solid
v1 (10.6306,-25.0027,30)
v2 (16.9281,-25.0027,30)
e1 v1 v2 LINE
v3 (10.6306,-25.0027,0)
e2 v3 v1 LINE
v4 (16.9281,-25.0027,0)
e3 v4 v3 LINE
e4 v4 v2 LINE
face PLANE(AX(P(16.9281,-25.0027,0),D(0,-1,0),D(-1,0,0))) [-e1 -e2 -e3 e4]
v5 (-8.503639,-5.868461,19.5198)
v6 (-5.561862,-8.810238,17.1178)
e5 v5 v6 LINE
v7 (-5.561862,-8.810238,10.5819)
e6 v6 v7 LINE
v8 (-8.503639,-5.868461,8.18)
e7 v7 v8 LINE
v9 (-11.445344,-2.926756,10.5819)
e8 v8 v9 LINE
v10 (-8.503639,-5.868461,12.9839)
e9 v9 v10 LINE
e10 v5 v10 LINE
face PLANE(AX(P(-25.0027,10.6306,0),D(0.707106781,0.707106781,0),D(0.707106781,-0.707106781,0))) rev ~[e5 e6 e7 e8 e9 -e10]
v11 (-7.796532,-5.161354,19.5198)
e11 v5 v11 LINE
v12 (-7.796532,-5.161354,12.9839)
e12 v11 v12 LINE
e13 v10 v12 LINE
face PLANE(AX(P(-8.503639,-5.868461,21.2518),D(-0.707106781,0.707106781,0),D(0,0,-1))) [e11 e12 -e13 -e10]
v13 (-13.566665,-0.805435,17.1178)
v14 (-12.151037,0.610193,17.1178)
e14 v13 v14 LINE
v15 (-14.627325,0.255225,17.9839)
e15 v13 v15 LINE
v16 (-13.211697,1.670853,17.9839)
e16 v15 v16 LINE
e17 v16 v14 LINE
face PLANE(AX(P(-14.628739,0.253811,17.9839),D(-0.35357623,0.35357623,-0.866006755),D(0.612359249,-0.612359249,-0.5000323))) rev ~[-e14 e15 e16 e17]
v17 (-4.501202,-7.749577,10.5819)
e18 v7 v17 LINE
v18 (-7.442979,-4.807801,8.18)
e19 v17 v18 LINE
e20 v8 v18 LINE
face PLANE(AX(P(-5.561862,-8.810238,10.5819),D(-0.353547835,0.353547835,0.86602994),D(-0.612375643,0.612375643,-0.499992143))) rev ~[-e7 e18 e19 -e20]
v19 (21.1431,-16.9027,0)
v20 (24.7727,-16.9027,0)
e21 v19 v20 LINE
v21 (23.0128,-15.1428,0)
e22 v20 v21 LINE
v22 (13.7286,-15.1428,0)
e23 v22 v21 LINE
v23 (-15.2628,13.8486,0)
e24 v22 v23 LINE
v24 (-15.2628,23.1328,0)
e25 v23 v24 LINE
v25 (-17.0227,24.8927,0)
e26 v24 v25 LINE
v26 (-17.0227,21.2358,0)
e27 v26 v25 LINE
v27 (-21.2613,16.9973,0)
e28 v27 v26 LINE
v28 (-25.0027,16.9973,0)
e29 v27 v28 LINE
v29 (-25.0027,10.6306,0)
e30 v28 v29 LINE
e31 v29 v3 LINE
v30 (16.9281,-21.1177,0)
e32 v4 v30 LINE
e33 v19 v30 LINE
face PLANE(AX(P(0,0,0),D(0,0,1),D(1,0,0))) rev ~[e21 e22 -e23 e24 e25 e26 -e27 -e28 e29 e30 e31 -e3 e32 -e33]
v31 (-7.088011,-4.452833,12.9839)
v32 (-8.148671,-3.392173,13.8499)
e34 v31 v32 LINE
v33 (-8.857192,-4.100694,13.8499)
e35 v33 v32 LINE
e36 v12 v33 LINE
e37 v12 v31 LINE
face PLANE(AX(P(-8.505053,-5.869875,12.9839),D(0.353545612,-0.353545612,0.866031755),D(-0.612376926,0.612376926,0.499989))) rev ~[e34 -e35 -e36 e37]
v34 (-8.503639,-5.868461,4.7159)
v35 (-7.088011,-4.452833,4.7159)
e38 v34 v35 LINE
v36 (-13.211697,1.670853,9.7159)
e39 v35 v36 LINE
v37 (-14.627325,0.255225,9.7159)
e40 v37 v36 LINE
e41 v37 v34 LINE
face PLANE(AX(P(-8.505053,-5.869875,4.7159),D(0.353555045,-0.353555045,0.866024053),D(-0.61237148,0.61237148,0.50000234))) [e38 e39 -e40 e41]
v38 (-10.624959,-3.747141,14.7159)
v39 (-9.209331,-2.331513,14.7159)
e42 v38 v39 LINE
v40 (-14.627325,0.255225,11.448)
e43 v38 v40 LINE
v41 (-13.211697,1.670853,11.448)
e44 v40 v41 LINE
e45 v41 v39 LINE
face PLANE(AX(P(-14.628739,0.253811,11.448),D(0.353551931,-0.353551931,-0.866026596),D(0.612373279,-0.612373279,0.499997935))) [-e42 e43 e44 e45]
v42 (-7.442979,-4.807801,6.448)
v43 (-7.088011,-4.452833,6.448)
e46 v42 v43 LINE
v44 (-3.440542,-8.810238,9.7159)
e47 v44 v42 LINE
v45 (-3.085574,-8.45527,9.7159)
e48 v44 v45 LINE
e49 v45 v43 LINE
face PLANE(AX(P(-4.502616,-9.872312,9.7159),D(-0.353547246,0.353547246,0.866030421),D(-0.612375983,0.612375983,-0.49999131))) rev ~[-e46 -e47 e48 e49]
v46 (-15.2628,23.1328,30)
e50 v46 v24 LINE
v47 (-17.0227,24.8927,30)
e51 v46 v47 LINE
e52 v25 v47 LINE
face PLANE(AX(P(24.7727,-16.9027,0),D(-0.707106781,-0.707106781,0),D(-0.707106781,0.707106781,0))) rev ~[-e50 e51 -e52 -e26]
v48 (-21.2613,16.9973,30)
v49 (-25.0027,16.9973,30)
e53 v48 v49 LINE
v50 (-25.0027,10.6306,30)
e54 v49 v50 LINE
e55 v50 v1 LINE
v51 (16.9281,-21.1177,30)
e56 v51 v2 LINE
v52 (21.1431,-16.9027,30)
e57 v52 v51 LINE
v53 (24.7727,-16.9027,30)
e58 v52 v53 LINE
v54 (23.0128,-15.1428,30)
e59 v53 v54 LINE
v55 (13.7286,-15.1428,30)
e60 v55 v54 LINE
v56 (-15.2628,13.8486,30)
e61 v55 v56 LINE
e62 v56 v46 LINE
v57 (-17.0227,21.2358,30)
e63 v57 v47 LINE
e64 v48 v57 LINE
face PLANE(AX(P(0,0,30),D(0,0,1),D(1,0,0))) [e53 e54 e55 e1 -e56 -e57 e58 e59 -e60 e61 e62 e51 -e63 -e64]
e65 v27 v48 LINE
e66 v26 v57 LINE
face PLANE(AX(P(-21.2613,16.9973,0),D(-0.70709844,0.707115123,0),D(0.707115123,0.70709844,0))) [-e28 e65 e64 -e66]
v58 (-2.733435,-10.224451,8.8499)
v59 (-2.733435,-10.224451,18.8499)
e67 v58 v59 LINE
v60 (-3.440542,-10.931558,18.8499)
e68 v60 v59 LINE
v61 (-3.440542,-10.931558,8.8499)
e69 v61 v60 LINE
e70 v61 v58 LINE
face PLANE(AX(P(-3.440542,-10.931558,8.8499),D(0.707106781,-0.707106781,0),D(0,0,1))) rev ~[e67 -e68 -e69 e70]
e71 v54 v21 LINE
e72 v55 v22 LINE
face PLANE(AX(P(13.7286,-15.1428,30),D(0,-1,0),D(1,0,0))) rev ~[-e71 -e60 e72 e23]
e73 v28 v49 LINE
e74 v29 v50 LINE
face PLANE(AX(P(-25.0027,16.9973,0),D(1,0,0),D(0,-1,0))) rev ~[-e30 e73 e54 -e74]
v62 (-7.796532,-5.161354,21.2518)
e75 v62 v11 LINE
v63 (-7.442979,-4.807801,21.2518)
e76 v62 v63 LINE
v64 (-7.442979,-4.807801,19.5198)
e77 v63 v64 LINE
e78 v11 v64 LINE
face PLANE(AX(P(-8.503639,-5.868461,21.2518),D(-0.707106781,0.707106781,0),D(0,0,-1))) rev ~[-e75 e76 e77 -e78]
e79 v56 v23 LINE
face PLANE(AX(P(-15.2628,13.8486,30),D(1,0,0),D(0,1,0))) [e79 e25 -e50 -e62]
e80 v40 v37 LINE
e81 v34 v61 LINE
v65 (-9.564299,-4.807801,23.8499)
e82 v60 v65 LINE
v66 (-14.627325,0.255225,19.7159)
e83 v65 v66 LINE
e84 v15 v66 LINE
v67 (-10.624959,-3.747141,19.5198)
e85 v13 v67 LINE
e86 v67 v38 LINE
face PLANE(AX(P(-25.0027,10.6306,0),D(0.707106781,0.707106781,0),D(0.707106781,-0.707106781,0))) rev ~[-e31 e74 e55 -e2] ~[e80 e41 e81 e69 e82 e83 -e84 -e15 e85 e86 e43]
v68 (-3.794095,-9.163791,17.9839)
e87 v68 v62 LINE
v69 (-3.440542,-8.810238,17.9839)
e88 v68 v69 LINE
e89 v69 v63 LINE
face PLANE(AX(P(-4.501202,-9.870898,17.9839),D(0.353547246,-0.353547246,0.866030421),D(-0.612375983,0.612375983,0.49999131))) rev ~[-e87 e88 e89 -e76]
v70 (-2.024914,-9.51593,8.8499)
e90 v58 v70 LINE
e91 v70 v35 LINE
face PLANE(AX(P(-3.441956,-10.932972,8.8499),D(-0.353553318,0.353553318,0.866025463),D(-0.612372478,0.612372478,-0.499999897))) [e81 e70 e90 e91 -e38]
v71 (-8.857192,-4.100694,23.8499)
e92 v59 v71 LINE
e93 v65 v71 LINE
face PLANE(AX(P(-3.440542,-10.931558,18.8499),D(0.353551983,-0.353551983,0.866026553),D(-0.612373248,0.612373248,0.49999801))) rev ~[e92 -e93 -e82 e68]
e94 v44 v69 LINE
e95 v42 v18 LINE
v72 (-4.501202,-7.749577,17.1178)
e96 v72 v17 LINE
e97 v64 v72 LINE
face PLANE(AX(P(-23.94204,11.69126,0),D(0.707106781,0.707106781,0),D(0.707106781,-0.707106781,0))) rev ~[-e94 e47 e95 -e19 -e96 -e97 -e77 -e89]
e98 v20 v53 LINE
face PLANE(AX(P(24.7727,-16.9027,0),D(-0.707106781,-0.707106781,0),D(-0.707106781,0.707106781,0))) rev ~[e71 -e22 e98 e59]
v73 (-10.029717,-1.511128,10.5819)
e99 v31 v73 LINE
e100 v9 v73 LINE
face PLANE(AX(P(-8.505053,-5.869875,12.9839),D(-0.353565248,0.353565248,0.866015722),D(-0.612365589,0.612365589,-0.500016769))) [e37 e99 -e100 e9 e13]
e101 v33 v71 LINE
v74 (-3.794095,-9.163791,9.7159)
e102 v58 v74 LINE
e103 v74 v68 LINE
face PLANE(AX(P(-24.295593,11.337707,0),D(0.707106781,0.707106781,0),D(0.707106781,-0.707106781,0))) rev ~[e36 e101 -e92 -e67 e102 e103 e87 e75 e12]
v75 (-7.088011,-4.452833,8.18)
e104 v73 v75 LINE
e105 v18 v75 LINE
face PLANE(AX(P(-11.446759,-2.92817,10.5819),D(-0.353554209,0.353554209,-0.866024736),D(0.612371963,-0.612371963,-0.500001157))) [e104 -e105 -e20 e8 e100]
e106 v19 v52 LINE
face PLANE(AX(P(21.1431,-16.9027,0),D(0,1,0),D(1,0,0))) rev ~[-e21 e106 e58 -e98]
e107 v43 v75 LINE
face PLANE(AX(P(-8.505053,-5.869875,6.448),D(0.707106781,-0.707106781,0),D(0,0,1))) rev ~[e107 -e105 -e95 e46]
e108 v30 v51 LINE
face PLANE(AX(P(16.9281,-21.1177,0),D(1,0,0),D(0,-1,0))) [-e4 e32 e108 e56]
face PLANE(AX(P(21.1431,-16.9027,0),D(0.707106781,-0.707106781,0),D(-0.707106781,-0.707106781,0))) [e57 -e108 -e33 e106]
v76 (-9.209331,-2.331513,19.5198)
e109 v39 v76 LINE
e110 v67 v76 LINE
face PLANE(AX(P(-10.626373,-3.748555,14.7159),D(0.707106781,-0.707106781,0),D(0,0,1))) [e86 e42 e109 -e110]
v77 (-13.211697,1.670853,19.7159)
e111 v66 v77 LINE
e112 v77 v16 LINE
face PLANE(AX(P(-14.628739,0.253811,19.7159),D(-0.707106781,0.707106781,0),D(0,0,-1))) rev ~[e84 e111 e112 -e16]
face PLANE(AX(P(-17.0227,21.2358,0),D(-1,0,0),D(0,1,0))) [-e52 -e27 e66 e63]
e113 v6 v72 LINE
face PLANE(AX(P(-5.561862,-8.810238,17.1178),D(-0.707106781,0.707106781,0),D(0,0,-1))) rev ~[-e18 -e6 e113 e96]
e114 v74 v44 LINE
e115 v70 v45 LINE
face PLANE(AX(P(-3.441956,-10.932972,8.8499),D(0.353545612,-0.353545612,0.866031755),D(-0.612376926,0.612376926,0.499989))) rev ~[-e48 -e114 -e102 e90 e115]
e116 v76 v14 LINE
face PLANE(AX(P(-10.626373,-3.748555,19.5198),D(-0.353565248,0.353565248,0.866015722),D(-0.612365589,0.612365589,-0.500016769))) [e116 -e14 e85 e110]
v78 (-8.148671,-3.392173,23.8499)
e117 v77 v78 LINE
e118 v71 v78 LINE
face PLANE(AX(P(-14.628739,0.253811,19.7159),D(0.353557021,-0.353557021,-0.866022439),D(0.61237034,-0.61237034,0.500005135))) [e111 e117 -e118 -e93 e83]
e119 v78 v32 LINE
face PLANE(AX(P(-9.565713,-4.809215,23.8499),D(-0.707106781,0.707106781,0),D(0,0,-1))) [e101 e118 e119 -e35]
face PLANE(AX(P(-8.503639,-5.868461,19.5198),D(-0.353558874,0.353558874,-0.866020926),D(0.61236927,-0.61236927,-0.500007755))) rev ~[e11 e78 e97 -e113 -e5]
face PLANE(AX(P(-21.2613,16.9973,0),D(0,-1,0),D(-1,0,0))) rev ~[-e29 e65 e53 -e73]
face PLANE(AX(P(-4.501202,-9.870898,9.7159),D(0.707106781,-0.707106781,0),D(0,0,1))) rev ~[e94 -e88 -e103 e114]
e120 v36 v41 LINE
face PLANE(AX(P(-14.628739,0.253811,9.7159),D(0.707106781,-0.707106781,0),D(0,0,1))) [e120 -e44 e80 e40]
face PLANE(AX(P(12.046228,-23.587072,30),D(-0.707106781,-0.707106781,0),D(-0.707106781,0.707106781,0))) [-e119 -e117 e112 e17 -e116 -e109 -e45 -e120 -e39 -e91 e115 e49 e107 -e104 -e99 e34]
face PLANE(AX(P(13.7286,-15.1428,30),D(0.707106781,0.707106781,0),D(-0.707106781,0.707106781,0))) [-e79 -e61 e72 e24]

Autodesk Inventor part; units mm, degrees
ref_plane "YZ Plane" through (0, 0, 0) normal (1, 0, 0) x (0, 1, 0)
ref_plane "XZ Plane" through (0, 0, 0) normal (0, 1, 0) x (-1, 0, 0)
sketch "Sketch1" plane through (0, 0, 0) normal (0, 0, 1) x (1, 0, 0)
  line L0 (21.1431, -16.9027) -> (16.9281, -21.1177)
  line L1 (-21.2613, 16.9973) -> (-17.0227, 21.2358)
  line L2 (-17.0227, 21.2358) -> (16.9281, -21.1177) construction
  line L3 (21.1431, -16.9027) -> (-21.2613, 16.9973) construction
  line L4 (-17.0227, 21.2358) -> (36.8231, 21.2358) construction
  line L5 (16.9281, -21.1177) -> (16.9281, -25.0027)
  line L6 (-17.0227, 21.2358) -> (-17.0227, 24.8927)
  line L7 (21.1431, -16.9027) -> (24.7727, -16.9027)
  line L8 (24.7727, -16.9027) -> (-17.0227, 24.8927)
  line L9 (-25.0027, 16.9973) -> (-25.0027, 10.6306)
  line L10 (16.9281, -25.0027) -> (10.6306, -25.0027)
  line L11 (-25.0027, 10.6306) -> (10.6306, -25.0027)
  line L12 (-25.0027, 16.9973) -> (-7.0741, 16.9973) construction
  line L13 (-17.1227, 21.2773) -> (-21.3027, 17.0973)
  line L14 (16.8927, -21.1827) -> (21.0727, -17.0027)
  line L15 (24.7727, -17.0027) -> (21.1414, -17.0027)
  line L16 (22.7727, -25.0027) -> (-23.0273, -25.0027)
  line L17 (16.8927, -25.0027) -> (16.8927, -21.2526)
  line L18 (-17.1227, 25.0973) -> (-17.1227, 21.3471)
  line L19 (-25.0027, 17.0973) -> (-21.3714, 17.0973)
  line L20 (-21.2613, 16.9973) -> (-25.0027, 16.9973)
  point P0 (0, 0)
  point P1 (16.8927, -21.2526)
extrude "Extrusion1" add sketch "Sketch1" along normal blind 30
ref_plane "Work Plane1" through (16.9, -16.9, -8) normal (-0.7071068, -0.7071068, 0) x (0, 0, 1)
sketch "Sketch7" plane through (0, 0, 30) normal (0, 0, 1) x (1, 0, 0)
  line L0 (21.1431, -16.9027) -> (24.7727, -16.9027) projected
  line L1 (24.7727, -16.9027) -> (-17.0227, 24.8927) projected
  line L2 (-17.0227, 24.8927) -> (-17.0227, 21.2358) projected
  line L3 (-17.0227, 21.2358) -> (-21.2613, 16.9973) projected
  line L4 (-21.2613, 16.9973) -> (-25.0027, 16.9973) projected
  line L5 (-25.0027, 16.9973) -> (-25.0027, 10.6306) projected
  line L6 (-25.0027, 10.6306) -> (10.6306, -25.0027) projected
  line L7 (10.6306, -25.0027) -> (16.9281, -25.0027) projected
  line L8 (16.9281, -25.0027) -> (16.9281, -21.1177) projected
  line L9 (16.9281, -21.1177) -> (21.1431, -16.9027) projected
  line L10 (3.875, 3.995) -> (-7.1861, -7.1861)
  line L11 (-25.0027, 10.6306) -> (10.6306, -25.0027) projected
  line L12 (23.0128, -5.8586) -> (13.7286, -15.1428)
  line L13 (13.7286, -15.1428) -> (-15.2628, 13.8486)
  line L14 (-15.2628, 13.8486) -> (-5.9786, 23.1328)
  line L15 (-5.9786, 23.1328) -> (23.0128, -5.8586)
  line L16 (23.0128, -5.8586) -> (-15.2628, 13.8486) construction
  line L17 (13.7286, -15.1428) -> (-5.9786, 23.1328) construction
  line L18 (-15.2628, 13.8486) -> (-15.2628, 23.1328)
  line L19 (24.7727, -16.9027) -> (-17.0227, 24.8927) projected
  line L20 (13.7286, -15.1428) -> (23.0128, -15.1428)
  point P0 (0, 0)
  dimension "d28" = 41
  dimension "d29" = 1
  dimension "d74" = 0
extrude "Extrusion7" cut sketch "Sketch7" against normal through all contours L20 L12 L1 | L12 L13 L10 L1 | L1 L14 L15 L12 | L10 L13 L14 L1 | L14 L18 L1
sketch "Sketch10" plane through (10.6306, -25.0027, 30) normal (-0.7071068, -0.7071068, 0) x (-0.7071068, 0.7071068, 0)
  line L0 (1.6838, 16.5215) -> (7.0744, 19.4702) construction
  line L1 (7.0744, 19.4702) -> (7.0744, 10.5304) construction
  line L2 (7.0744, 10.5304) -> (1.6838, 10.5304) construction
  line L3 (1.6838, 10.5304) -> (1.6838, 6.839) construction
  line L4 (1.6838, 6.839) -> (6.7206, 6.839) construction
  line L5 (6.7206, 6.839) -> (6.7206, 1.2092) construction
  line L6 (6.7206, 1.2092) -> (1.6838, 1.2092) construction
  line L7 (1.6838, 1.2092) -> (1.6838, -3.423) construction
  line L8 (1.6838, -3.423) -> (55.1934, -3.423) construction
  line L9 (1.6838, 30.377) -> (1.6838, 26.2152) construction
  line L10 (1.6838, 26.2152) -> (7.1181, 26.2152) construction
  line L11 (7.1181, 26.2152) -> (7.1181, 20.0634) construction
  line L12 (7.1181, 20.0634) -> (1.6838, 20.0634) construction
  line L13 (1.6838, 20.0634) -> (1.6838, 16.5215) construction
  line L14 (7.0744, 15.0003) -> (55.1934, 14.9149) construction
  line L15 (1.6838, 30.377) -> (36.6838, 30.377) construction
  line L16 (36.6838, -3.423) -> (1.6838, -3.423) construction
  line L17 (19.8996, 21.1501) -> (19.8996, 11.1501)
  line L18 (19.8996, 11.1501) -> (28.5599, 6.1501)
  line L19 (19.8996, 21.1501) -> (21.3996, 20.2841)
  line L20 (21.3996, 20.2841) -> (21.3996, 12.0161)
  line L21 (21.3996, 12.0161) -> (27.0599, 8.7482)
  line L22 (27.0599, 8.7482) -> (27.0599, 17.0161)
  line L23 (27.0599, 17.0161) -> (28.5599, 16.1501)
  line L24 (28.5599, 16.1501) -> (28.5599, 6.1501)
  line L25 (50.3931, 0) -> (0, 0) construction
  line L26 (50.3931, 30) -> (50.3931, 0) construction
  line L27 (50.3931, 15) -> (0, 15) construction
  line L28 (0, 30) -> (0, 0) construction
  point P0 (25.1966, 30)
  point P1 (25.1966, 15)
  dimension "d40" = 1.5
  dimension "d41" = 1.5
  dimension "d42" = 1.5
  dimension "d43" = 10
  dimension "d44" = 10
  dimension "d75" = 8.268
  dimension "d76" = 120
emboss "Emboss1" sketch "Sketch10" operation cut depth 1 direction (0.7071068, 0.7071068, 0)
sketch "Sketch11" plane through (10.6306, -25.0027, 30) normal (-0.7071068, -0.7071068, 0) x (-0.7071068, 0.7071068, 0)
  line L0 (21.3996, 12.0161) -> (27.0599, 8.7482) construction
  line L1 (27.0599, 8.7482) -> (27.0599, 17.0161) construction
  line L2 (27.0599, 17.0161) -> (28.5599, 16.1501) construction
  line L3 (28.5599, 16.1501) -> (28.5599, 6.1501) construction
  line L4 (28.5599, 6.1501) -> (19.8996, 11.1501) construction
  line L5 (19.8996, 11.1501) -> (19.8996, 21.1501) construction
  line L6 (19.8996, 21.1501) -> (21.3996, 20.2841) construction
  line L7 (21.3996, 20.2841) -> (21.3996, 12.0161) construction
  line L8 (50.3931, 30) -> (0, 30) construction
  line L9 (0, 30) -> (0, 0) construction
  line L10 (50.3931, 0) -> (0, 0) construction
  line L11 (50.3931, 30) -> (50.3931, 0) construction
  line L12 (9.2379, 27.3057) -> (21.3996, 20.2841) construction
  line L13 (21.3996, 20.2841) -> (21.3996, 12.0161) construction
  line L14 (21.3996, 12.0161) -> (27.0599, 8.7482) construction
  line L15 (27.0599, 8.7482) -> (27.0599, 7.4216) construction
  line L16 (27.0599, 7.4216) -> (17.8982, 13.0177) construction
  line L17 (17.8982, 13.0177) -> (17.8982, 3.0177) construction
  line L18 (17.8982, 3.0177) -> (9.2379, 8.0177) construction
  line L19 (9.2379, 8.0177) -> (9.2379, 27.3057) construction
  line L20 (15.5651, 18.4016) -> (15.5, -16.9) construction
  line L21 (15.5651, 18.4016) -> (-17.5, 16.9) construction
  line L22 (-17.5, 16.9) -> (-17.5, 12.7382) construction
  line L23 (-17.5, 12.7382) -> (-12.0658, 12.7382) construction
  line L24 (-12.0658, 12.7382) -> (-12.0658, 6.5864) construction
  line L25 (-12.0658, 6.5864) -> (-17.5, 6.5864) construction
  line L26 (-17.5, 6.5864) -> (-17.5, 3.0446) construction
  line L27 (-17.5, 3.0446) -> (-12.1095, 3.0446) construction
  line L28 (-12.1095, 3.0446) -> (-12.1095, -2.9465) construction
  line L29 (-12.1095, -2.9465) -> (-17.5, -2.9465) construction
  line L30 (-17.5, -2.9465) -> (-17.5, -6.638) construction
  line L31 (-17.5, -6.638) -> (-12.4632, -6.638) construction
  line L32 (-12.4632, -6.638) -> (-12.4632, -12.2678) construction
  line L33 (-12.4632, -12.2678) -> (-17.5, -12.2678) construction
  line L34 (-17.5, -12.2678) -> (-17.5, -16.9) construction
  line L35 (-17.5, -16.9) -> (15.5, -16.9) construction
  line L36 (-12.1095, 0.049) -> (15.5326, 0.7508) construction
  line L37 (15.5, -16.9) -> (15.5651, 18.4016) construction
  line L38 (1.91, 17.7815) -> (1.91, -16.9) construction
  line L39 (15.5, -16.9) -> (-17.5, -16.9) construction
  line L40 (27.0599, 8.7482) -> (27.0599, 7.4216) construction
  line L41 (21.3996, 20.2841) -> (21.3996, 12.0161)
  line L42 (21.3996, 12.0161) -> (27.0599, 8.7482)
  line L43 (21.3996, 20.2841) -> (21.3996, 12.0161)
  line L44 (21.3996, 12.0161) -> (27.0599, 8.7482)
  line L45 (27.0599, 8.7482) -> (27.0599, 10.4802)
  line L46 (27.0599, 8.7482) -> (27.0599, 7.4216)
  line L47 (27.0599, 10.4802) -> (22.8996, 12.8822)
  line L48 (22.8996, 12.8822) -> (22.8996, 19.4181)
  line L49 (22.8996, 19.4181) -> (27.0599, 21.82)
  line L50 (21.3996, 20.2841) -> (27.0599, 23.552)
  line L51 (27.0599, 23.552) -> (27.0599, 21.82)
  point P0 (25.1966, 30)
  point P1 (20.9754, 14.9785)
  dimension "d47" = 120
  dimension "d48" = 1.5
  dimension "d49" = 1.5
  dimension "d50" = 1.5
  dimension "d77" = 8.268
  dimension "d78" = 4.1602
  dimension "d79" = 5.6602
  dimension "d80" = 120
  dimension "d81" = 120
emboss "Emboss2" sketch "Sketch11" operation cut depth 1.5 direction (0.7071068, 0.7071068, 0)
sketch "Sketch12" plane through (10.6306, -25.0027, 30) normal (-0.7071068, -0.7071068, 0) x (-0.7071068, 0.7071068, 0)
  line L0 (22.8996, 12.8822) -> (27.0599, 10.4802) construction
  line L1 (27.0599, 10.4802) -> (27.0599, 17.0161) construction
  line L2 (27.0599, 17.0161) -> (28.5599, 16.1501) construction
  line L3 (28.5599, 16.1501) -> (28.5599, 6.1501) construction
  line L4 (28.5599, 6.1501) -> (19.8996, 11.1501) construction
  line L5 (19.8996, 11.1501) -> (19.8996, 21.1501) construction
  line L6 (19.8996, 21.1501) -> (21.3996, 20.2841) construction
  line L7 (21.3996, 20.2841) -> (27.0599, 23.552) construction
  line L8 (27.0599, 23.552) -> (27.0599, 21.82) construction
  line L9 (27.0599, 21.82) -> (22.8996, 19.4181) construction
  line L10 (22.8996, 19.4181) -> (22.8996, 12.8822) construction
  line L11 (50.3931, 30) -> (0, 30) construction
  line L12 (0, 30) -> (0, 0) construction
  line L13 (50.3931, 0) -> (0, 0) construction
  line L14 (50.3931, 30) -> (50.3931, 0) construction
  line L15 (12.7689, 9.4432) -> (16.9291, 7.0413) construction
  line L16 (16.9291, 7.0413) -> (27.0599, 17.0161) construction
  line L17 (27.0599, 17.0161) -> (28.5599, 16.1501) construction
  line L18 (28.5599, 16.1501) -> (28.5599, 6.1501) construction
  line L19 (28.5599, 6.1501) -> (13.0911, 5.9826) construction
  line L20 (13.0911, 5.9826) -> (19.8996, 21.1501) construction
  line L21 (19.8996, 21.1501) -> (21.3996, 20.2841) construction
  line L22 (21.3996, 20.2841) -> (27.0599, 23.552) construction
  line L23 (27.0599, 23.552) -> (27.0599, 21.82) construction
  line L24 (27.0599, 21.82) -> (12.7689, 15.9791) construction
  line L25 (12.7689, 15.9791) -> (12.7689, 9.4432) construction
  line L26 (-17.5, 16.9) -> (-17.5, 12.7382) construction
  line L27 (-17.5, 12.7382) -> (-12.0658, 12.7382) construction
  line L28 (-12.0658, 12.7382) -> (-12.0658, 6.5864) construction
  line L29 (-12.0658, 6.5864) -> (-17.5, 6.5864) construction
  line L30 (-17.5, 6.5864) -> (-17.5, 3.0446) construction
  line L31 (-17.5, 3.0446) -> (-12.1095, 3.0446) construction
  line L32 (-12.1095, 3.0446) -> (-12.1095, -2.9465) construction
  line L33 (-12.1095, -2.9465) -> (-17.5, -2.9465) construction
  line L34 (-17.5, -2.9465) -> (-17.5, -6.638) construction
  line L35 (-17.5, -6.638) -> (-12.4632, -6.638) construction
  line L36 (-12.4632, -6.638) -> (-12.4632, -12.2678) construction
  line L37 (-12.4632, -12.2678) -> (-17.5, -12.2678) construction
  line L38 (-17.5, -12.2678) -> (-17.5, -16.9) construction
  line L39 (-17.5, -16.9) -> (15.5, -16.9) construction
  line L40 (21.3996, 20.2841) -> (27.0599, 23.552)
  line L41 (19.8996, 21.1501) -> (21.3996, 20.2841)
  line L42 (21.3996, 20.2841) -> (27.0599, 23.552)
  line L43 (27.0599, 23.552) -> (27.0599, 21.82)
  line L44 (27.0599, 23.552) -> (27.0599, 21.82)
  line L45 (16.9291, 7.0413) -> (27.0599, 17.0161) construction
  line L46 (19.8996, 21.1501) -> (27.0599, 25.2841)
  line L47 (27.0599, 25.2841) -> (35.7201, 20.2841)
  line L48 (35.7201, 20.2841) -> (35.7201, 18.552)
  line L49 (35.7201, 18.552) -> (30.0599, 15.2841)
  line L50 (30.0599, 15.2841) -> (30.0599, 10.4802)
  line L51 (30.0599, 10.4802) -> (34.2201, 12.8822)
  line L52 (35.7201, 10.2841) -> (35.7201, 10.2841)
  line L53 (35.7201, 10.2841) -> (28.5599, 6.1501)
  line L54 (27.0599, 17.0161) -> (28.5599, 16.1501)
  line L55 (28.5599, 6.1501) -> (28.5599, 16.1501)
  line L56 (28.5599, 16.1501) -> (27.0599, 17.0161)
  line L57 (27.0599, 21.82) -> (27.0599, 23.552)
  line L58 (28.5599, 16.1501) -> (28.5599, 6.1501)
  line L59 (27.0599, 17.0161) -> (31.2201, 19.4181)
  line L60 (31.2201, 19.4181) -> (27.0599, 21.82)
  line L61 (13.0911, 5.9826) -> (28.5599, 6.1501) construction
  line L62 (12.7689, 9.4432) -> (16.9291, 7.0413) construction
  line L63 (12.7689, 9.4432) -> (28.5599, 9.6142) construction
  line L64 (28.5599, 9.6142) -> (29.486, 10.1489) construction
  line L65 (28.5599, 16.1501) -> (35.7201, 20.2841) construction
  line L66 (28.5599, 6.1501) -> (34.2971, 9.4625) construction
  line L67 (31.2201, 19.4181) -> (35.3769, 18.7502) construction
  line L68 (27.0599, 23.552) -> (27.0599, 21.82) construction
  line L69 (35.3769, 18.7502) -> (27.0599, 23.552) construction
  line L70 (35.7201, 10.2841) -> (35.7201, 12.0161)
  line L71 (35.7201, 12.0161) -> (34.2201, 12.8822)
  line L72 (16.3223, 7.4494) -> (20.4826, 5.0475) construction
  line L73 (16.3223, 13.9853) -> (16.3223, 7.4494) construction
  line L74 (20.4826, 16.3872) -> (16.3223, 13.9853) construction
  line L75 (20.4826, 18.1193) -> (20.4826, 16.3872) construction
  line L76 (14.8223, 14.8513) -> (20.4826, 18.1193) construction
  line L77 (14.8223, 15.7065) -> (14.8223, 14.8513) construction
  line L78 (20.4826, 12.5307) -> (14.8223, 15.7065) construction
  line L79 (20.4826, 5.0475) -> (20.4826, 12.5307) construction
  line L80 (20.4826, 12.5307) -> (28.5599, 7.9987) construction
  line L81 (28.5599, 7.9987) -> (33.93, 11.0117) construction
  point P0 (25.1966, 30)
  point P1 (20.9754, 14.9785)
  dimension "d54" = 60
  dimension "d55" = 1.5
  dimension "d57" = 120
  dimension "d58" = 1.5
  dimension "d59" = 120
  dimension "d82" = 3
  dimension "d83" = 3
  dimension "d84" = 3
  dimension "d85" = 1.5
  dimension "d86" = 7.1602
  dimension "d87" = 7.1602
  dimension "d88" = 4.1602
  dimension "d89" = 1.7321
  dimension "d90" = 5.6602
  dimension "d91" = 1.7321
  dimension "d92" = 4.1602
extrude "Extrusion9" cut sketch "Sketch12" against normal blind 2
ref_plane "Arbeitsebene4" through (-16.9409, 16.9409, 0) normal (-0.7071068, -0.7071068, 0) x (0, 0, 1)
ref_plane "Arbeitsebene5" through (-2.1793, -2.1793, 0) normal (-0.7071068, 0.7071068, 0) x (-0.7071068, -0.7071068, 0)
equation "\"d3\" = MirrorThickness1"
equation "\"d41\" = d40"
equation "\"d42\" = d40"
equation "\"d44\" = d43"
equation "\"d48\" = d51"
equation "\"d49\" = d51"
equation "\"d50\" = d51"
equation "\"d55\" = d60"
equation "\"d58\" = d60"
equation "\"MirrorThickness1\" = 30"
equation "\"d51\" = 1.5"
equation "\"d60\" = 1.5"
properties part number "20_Cube_Insert_Mirror_Holder_wLogo_Astromedia_30x40x1_v3"
